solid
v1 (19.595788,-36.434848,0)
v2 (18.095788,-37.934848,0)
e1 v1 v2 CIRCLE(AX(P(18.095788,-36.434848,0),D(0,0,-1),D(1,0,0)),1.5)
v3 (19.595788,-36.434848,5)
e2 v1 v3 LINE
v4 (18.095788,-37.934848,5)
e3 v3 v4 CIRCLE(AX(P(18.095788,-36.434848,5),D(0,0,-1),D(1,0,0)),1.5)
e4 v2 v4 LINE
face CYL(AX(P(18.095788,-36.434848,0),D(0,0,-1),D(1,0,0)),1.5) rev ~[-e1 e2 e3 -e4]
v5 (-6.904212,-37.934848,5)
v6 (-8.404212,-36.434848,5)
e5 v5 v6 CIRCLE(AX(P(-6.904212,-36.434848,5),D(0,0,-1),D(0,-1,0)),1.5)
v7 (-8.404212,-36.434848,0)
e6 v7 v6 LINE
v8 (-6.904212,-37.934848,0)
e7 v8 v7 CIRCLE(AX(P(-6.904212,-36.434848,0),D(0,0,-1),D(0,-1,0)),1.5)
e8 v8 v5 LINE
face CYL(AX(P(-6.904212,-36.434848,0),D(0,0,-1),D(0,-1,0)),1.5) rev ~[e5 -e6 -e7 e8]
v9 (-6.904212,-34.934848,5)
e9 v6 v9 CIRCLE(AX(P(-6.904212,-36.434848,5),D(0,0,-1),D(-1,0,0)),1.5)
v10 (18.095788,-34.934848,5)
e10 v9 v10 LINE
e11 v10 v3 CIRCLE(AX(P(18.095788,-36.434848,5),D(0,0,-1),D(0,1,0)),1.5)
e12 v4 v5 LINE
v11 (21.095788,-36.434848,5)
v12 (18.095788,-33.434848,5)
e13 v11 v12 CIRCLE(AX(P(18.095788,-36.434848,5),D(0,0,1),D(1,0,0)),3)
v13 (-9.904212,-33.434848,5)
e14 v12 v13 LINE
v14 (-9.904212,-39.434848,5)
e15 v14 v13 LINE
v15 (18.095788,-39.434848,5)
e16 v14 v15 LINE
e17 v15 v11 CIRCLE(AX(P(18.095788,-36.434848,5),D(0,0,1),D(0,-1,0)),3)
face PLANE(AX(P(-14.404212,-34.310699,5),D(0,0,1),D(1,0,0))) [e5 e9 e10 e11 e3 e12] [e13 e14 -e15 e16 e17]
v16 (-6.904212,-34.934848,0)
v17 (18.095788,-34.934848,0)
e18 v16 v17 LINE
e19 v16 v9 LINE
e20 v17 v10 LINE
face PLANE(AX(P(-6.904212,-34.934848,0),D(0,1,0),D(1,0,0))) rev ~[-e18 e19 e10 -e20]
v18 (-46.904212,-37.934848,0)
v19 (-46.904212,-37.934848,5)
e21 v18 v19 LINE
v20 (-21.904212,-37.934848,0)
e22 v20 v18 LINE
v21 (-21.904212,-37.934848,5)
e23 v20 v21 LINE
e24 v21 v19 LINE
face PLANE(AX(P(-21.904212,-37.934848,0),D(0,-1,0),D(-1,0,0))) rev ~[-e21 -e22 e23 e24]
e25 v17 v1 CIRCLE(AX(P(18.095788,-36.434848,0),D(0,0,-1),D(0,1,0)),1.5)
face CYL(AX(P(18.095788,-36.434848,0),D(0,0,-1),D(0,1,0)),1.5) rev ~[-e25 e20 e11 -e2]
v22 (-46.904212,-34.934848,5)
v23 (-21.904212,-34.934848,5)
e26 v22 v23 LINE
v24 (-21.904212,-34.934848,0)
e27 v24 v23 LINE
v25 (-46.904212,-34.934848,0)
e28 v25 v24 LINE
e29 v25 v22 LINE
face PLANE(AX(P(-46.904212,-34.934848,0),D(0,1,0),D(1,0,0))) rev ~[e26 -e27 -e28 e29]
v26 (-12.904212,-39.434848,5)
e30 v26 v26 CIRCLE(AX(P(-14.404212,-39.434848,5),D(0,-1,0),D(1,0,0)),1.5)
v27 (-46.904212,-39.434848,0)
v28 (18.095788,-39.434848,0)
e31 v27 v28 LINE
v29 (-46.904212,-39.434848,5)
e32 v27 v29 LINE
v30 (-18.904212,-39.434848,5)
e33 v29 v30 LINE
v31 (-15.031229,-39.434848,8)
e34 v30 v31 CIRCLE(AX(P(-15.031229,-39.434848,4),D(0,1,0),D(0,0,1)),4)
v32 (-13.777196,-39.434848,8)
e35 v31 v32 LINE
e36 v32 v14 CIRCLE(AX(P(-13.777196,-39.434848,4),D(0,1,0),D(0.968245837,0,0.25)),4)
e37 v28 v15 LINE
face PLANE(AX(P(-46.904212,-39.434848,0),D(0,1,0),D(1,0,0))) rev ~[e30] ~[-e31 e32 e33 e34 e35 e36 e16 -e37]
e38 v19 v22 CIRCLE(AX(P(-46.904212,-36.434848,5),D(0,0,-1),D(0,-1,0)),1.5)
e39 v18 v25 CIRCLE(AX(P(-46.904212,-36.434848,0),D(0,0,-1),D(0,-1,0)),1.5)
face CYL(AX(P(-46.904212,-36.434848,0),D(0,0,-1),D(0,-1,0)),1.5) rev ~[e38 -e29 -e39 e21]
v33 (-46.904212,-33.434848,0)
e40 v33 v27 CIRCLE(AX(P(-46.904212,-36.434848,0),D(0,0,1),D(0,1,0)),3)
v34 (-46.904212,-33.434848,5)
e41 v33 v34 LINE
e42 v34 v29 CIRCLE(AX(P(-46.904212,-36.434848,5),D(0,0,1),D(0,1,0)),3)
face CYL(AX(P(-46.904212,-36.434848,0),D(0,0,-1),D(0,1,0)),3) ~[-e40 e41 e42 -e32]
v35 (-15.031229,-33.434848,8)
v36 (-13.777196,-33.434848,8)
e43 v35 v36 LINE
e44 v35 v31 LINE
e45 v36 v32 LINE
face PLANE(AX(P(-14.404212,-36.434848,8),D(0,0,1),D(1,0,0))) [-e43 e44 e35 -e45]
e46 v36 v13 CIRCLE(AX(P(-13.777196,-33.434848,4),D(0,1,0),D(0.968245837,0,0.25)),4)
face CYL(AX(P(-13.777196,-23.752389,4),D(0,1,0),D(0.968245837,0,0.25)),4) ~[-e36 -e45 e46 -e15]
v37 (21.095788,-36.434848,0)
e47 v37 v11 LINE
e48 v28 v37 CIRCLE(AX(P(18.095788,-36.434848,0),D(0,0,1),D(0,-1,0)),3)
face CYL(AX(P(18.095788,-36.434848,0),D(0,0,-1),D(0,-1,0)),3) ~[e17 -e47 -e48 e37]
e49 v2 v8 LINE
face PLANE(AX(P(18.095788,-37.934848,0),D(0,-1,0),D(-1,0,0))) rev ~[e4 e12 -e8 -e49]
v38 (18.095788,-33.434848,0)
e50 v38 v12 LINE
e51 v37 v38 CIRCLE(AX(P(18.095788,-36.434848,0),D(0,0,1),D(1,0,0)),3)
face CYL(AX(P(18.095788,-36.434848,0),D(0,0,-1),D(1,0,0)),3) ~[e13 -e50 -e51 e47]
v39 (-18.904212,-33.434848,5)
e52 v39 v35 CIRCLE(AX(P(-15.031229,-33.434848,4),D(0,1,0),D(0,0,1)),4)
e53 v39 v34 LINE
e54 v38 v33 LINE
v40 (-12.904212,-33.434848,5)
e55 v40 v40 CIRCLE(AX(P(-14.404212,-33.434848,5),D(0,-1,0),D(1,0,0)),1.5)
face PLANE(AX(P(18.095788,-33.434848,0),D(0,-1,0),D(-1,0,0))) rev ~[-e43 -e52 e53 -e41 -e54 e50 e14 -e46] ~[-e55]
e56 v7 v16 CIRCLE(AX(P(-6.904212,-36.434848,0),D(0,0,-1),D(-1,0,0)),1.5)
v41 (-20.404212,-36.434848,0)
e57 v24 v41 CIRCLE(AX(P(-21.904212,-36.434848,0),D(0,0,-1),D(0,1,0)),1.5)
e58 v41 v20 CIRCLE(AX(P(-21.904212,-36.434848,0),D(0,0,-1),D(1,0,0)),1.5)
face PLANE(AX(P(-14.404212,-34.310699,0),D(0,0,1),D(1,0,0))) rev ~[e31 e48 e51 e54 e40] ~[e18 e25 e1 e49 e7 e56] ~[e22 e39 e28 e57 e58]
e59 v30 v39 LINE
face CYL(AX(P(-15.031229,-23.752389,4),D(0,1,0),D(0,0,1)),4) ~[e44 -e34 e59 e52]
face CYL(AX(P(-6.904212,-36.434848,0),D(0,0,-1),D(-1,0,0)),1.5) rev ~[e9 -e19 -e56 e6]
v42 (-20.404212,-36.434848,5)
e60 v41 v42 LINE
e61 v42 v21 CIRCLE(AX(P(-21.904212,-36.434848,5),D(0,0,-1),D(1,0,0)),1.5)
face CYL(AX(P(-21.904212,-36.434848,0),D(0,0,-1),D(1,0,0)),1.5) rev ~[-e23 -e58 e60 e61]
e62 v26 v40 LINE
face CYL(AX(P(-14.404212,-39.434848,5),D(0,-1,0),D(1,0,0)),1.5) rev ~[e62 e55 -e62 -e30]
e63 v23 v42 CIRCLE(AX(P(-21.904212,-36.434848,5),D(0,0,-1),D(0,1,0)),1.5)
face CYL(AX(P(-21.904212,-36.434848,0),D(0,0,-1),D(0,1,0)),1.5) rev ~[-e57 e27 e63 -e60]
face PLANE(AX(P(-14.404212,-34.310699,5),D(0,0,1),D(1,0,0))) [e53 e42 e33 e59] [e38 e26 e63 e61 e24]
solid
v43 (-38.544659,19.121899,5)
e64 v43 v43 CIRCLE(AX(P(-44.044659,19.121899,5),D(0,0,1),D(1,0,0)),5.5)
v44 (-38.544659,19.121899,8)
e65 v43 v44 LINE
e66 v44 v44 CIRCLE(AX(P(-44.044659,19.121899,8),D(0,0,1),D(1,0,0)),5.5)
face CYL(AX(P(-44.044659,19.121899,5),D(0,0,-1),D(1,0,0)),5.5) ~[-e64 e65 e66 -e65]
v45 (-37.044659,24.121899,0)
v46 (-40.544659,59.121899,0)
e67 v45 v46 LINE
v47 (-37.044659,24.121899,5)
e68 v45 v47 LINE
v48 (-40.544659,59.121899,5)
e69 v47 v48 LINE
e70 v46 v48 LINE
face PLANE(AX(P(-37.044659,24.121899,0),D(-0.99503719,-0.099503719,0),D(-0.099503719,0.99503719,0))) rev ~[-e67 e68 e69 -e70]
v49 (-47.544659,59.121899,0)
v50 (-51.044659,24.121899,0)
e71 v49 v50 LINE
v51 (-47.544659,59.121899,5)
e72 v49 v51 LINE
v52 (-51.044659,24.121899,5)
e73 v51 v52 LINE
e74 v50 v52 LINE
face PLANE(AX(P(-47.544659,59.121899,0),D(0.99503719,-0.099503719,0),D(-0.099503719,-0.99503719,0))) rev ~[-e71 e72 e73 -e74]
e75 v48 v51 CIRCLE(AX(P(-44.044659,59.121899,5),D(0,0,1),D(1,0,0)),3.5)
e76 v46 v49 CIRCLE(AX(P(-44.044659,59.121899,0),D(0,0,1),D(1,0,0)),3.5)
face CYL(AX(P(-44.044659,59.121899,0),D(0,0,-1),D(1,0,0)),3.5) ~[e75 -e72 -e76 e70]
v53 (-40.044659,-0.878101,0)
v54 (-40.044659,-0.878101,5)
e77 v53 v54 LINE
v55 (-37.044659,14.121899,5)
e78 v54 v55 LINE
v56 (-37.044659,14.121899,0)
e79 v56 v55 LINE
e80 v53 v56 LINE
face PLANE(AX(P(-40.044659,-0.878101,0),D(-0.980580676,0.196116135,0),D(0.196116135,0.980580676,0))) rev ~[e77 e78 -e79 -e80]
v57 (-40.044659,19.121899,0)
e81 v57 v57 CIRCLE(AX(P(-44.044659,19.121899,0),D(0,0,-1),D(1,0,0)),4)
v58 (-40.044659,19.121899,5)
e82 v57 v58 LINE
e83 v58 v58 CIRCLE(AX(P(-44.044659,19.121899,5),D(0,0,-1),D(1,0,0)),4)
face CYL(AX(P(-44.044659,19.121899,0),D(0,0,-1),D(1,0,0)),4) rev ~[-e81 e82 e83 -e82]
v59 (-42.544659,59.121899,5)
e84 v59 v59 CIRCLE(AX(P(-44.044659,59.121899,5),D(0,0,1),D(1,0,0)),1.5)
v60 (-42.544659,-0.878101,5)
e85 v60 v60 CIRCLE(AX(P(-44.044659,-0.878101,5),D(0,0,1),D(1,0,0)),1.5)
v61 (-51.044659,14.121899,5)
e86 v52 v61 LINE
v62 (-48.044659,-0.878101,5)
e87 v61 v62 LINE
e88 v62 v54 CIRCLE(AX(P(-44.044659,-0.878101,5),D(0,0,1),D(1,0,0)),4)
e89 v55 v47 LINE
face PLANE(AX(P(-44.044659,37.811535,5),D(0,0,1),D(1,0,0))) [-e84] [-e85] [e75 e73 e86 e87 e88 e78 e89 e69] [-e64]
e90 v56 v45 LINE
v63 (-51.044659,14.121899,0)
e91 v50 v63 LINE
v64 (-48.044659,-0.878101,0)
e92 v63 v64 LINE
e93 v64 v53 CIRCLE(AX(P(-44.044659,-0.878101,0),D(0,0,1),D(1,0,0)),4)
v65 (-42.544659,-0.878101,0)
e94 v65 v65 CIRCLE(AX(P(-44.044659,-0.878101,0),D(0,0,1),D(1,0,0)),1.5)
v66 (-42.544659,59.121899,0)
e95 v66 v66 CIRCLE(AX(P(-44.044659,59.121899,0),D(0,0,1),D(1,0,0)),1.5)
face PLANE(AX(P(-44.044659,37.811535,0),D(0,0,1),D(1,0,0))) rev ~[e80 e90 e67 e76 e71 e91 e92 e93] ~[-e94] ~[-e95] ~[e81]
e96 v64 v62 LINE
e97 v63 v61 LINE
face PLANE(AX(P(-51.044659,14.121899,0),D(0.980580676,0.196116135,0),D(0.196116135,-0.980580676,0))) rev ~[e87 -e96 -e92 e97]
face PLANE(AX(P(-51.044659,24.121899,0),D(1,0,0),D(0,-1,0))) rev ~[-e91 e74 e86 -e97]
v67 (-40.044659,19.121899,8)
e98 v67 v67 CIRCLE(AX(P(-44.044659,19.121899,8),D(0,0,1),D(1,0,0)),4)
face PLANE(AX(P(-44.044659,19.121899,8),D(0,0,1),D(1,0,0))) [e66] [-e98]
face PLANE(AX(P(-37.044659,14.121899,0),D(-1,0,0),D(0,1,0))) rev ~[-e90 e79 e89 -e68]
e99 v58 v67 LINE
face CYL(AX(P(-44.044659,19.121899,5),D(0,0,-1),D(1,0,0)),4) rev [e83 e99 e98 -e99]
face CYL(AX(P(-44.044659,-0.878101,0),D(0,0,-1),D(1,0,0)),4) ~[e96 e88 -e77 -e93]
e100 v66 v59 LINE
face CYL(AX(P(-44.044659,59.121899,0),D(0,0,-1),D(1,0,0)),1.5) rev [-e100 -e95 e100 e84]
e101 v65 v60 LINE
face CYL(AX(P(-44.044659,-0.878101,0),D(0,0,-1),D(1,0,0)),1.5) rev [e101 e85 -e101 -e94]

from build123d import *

# Parameters (mm, degrees)
F0_R         = 1.5
F1_DEPTH     = 5
F2_R         = 5.5
F2_R_2       = 4
F3_DEPTH     = 3
F5_DEPTH     = 5
F6_W         = 9
F6_H         = 6
F7_DEPTH     = 3
F8_R         = 1.5
F9_DEPTH     = 25
F10_T1_DEPTH = 25.364916731


# Not quite as in the source:
# - a fillet or chamfer that OpenCascade refuses, or shapes differently, is made with other operations: its cross-section is extruded or revolved along the edge and cut away or added


with BuildPart() as f1:
    # F0 (on Top) → F1 (new body)
    with BuildSketch(Plane.XY):
        with BuildLine():
            ThreePointArc((-48.0446585417, 19.1218993813), (-44.0446585417, 23.1218993813), (-40.0446585417, 19.1218993813))
            Line((-40.0446585417, 19.1218993813), (-37.0446585417, 19.1218993813))
            Line((-37.0446585417, 19.1218993813), (-37.0446585417, 24.1218993813))
            Line((-37.0446585417, 24.1218993813), (-40.5446585417, 59.1218993813))
            ThreePointArc((-40.5446585417, 59.1218993813), (-44.0446585417, 55.6218993813), (-47.5446585417, 59.1218993813))
            Line((-47.5446585417, 59.1218993813), (-51.0446585417, 24.1218993813))
            Line((-51.0446585417, 24.1218993813), (-51.0446585417, 19.1218993813))
            Line((-51.0446585417, 19.1218993813), (-48.0446585417, 19.1218993813))
        make_face()
        with BuildLine():
            Line((-37.0446585417, 19.1218993813), (-40.0446585417, 19.1218993813))
            ThreePointArc((-40.0446585417, 19.1218993813), (-44.0446585417, 15.1218993813), (-48.0446585417, 19.1218993813))
            Line((-48.0446585417, 19.1218993813), (-51.0446585417, 19.1218993813))
            Line((-51.0446585417, 19.1218993813), (-51.0446585417, 14.1218993813))
            Line((-51.0446585417, 14.1218993813), (-48.0446585417, -0.8781006187))
            ThreePointArc((-48.0446585417, -0.8781006187), (-44.0446585417, 3.1218993813), (-40.0446585417, -0.8781006187))
            Line((-40.0446585417, -0.8781006187), (-37.0446585417, 14.1218993813))
            Line((-37.0446585417, 14.1218993813), (-37.0446585417, 19.1218993813))
        make_face()
        with BuildLine():
            ThreePointArc((-48.0446585417, -0.8781006187), (-44.0446585417, -4.8781006187), (-40.0446585417, -0.8781006187))
            ThreePointArc((-40.0446585417, -0.8781006187), (-44.0446585417, 3.1218993813), (-48.0446585417, -0.8781006187))
        make_face()
        with Locations((-44.0446585417, -0.8781006187)):
            Circle(F0_R, mode=Mode.SUBTRACT)
        with BuildLine():
            ThreePointArc((-47.5446585417, 59.1218993813), (-44.0446585417, 55.6218993813), (-40.5446585417, 59.1218993813))
            ThreePointArc((-40.5446585417, 59.1218993813), (-44.0446585417, 62.6218993813), (-47.5446585417, 59.1218993813))
        make_face()
        with Locations((-44.0446585417, 59.1218993813)):
            Circle(F0_R, mode=Mode.SUBTRACT)
    extrude(amount=F1_DEPTH)

    # F2 (on face) → F3 (join)
    with BuildSketch(Plane.XY.offset(5)):
        with Locations((-44.0446585417, 19.1218993813)):
            Circle(F2_R)
        with Locations((-44.0446585417, 19.1218993813)):
            Circle(F2_R_2, mode=Mode.SUBTRACT)
    extrude(amount=F3_DEPTH)


with BuildPart() as f5:
    # F4 (on Top) → F5 (new body)
    with BuildSketch(Plane.XY):
        with BuildLine():
            ThreePointArc((-46.904212172, -33.4348478615), (-45.404212172, -33.8367716502), (-44.3061359607, -34.9348478615))
            Line((-44.3061359607, -34.9348478615), (-21.904212172, -34.9348478615))
            ThreePointArc((-21.904212172, -34.9348478615), (-20.8435520003, -35.3741876897), (-20.404212172, -36.4348478615))
            Line((-20.404212172, -36.4348478615), (-8.404212172, -36.4348478615))
            ThreePointArc((-8.404212172, -36.4348478615), (-7.9648723438, -35.3741876897), (-6.904212172, -34.9348478615))
            Line((-6.904212172, -34.9348478615), (15.4977116166, -34.9348478615))
            ThreePointArc((15.4977116166, -34.9348478615), (16.595787828, -33.8367716502), (18.095787828, -33.4348478615))
            Line((18.095787828, -33.4348478615), (-46.904212172, -33.4348478615))
        make_face()
        with BuildLine():
            Line((-21.904212172, -37.9348478615), (-44.3061359607, -37.9348478615))
            ThreePointArc((-44.3061359607, -37.9348478615), (-45.404212172, -39.0329240729), (-46.904212172, -39.4348478615))
            Line((-46.904212172, -39.4348478615), (18.095787828, -39.4348478615))
            ThreePointArc((18.095787828, -39.4348478615), (16.595787828, -39.0329240729), (15.4977116166, -37.9348478615))
            Line((15.4977116166, -37.9348478615), (-6.904212172, -37.9348478615))
            ThreePointArc((-6.904212172, -37.9348478615), (-7.9648723438, -37.4955080333), (-8.404212172, -36.4348478615))
            Line((-8.404212172, -36.4348478615), (-20.404212172, -36.4348478615))
            ThreePointArc((-20.404212172, -36.4348478615), (-20.8435520003, -37.4955080333), (-21.904212172, -37.9348478615))
        make_face()
        with BuildLine():
            ThreePointArc((-46.904212172, -37.9348478615), (-48.404212172, -36.4348478615), (-46.904212172, -34.9348478615))
            Line((-46.904212172, -34.9348478615), (-44.3061359607, -34.9348478615))
            ThreePointArc((-44.3061359607, -34.9348478615), (-45.404212172, -33.8367716502), (-46.904212172, -33.4348478615))
            ThreePointArc((-46.904212172, -33.4348478615), (-49.904212172, -36.4348478615), (-46.904212172, -39.4348478615))
            ThreePointArc((-46.904212172, -39.4348478615), (-45.404212172, -39.0329240729), (-44.3061359607, -37.9348478615))
            Line((-44.3061359607, -37.9348478615), (-46.904212172, -37.9348478615))
        make_face()
        with BuildLine():
            ThreePointArc((21.095787828, -36.4348478615), (20.2171081715, -34.313527518), (18.095787828, -33.4348478615))
            ThreePointArc((18.095787828, -33.4348478615), (16.595787828, -33.8367716502), (15.4977116166, -34.9348478615))
            Line((15.4977116166, -34.9348478615), (18.095787828, -34.9348478615))
            ThreePointArc((18.095787828, -34.9348478615), (19.1564479997, -35.3741876897), (19.595787828, -36.4348478615))
            ThreePointArc((19.595787828, -36.4348478615), (19.1564479997, -37.4955080333), (18.095787828, -37.9348478615))
            Line((18.095787828, -37.9348478615), (15.4977116166, -37.9348478615))
            ThreePointArc((15.4977116166, -37.9348478615), (16.595787828, -39.0329240729), (18.095787828, -39.4348478615))
            ThreePointArc((18.095787828, -39.4348478615), (20.2171081715, -38.5561682051), (21.095787828, -36.4348478615))
        make_face()
    extrude(amount=F5_DEPTH)

    # F6 (on face) → F7 (join)
    with BuildSketch(Plane.XY.offset(5)):
        with Locations((-14.404212172, -36.4348478615)):
            Rectangle(F6_W, F6_H)
    extrude(amount=F7_DEPTH)

    # F8 (on face) → F9 (cut)
    with BuildSketch(Plane.XZ.offset(39.4348478615)):
        with Locations((-14.404212172, 5)):
            Circle(F8_R)
    extrude(amount=-F9_DEPTH, mode=Mode.SUBTRACT)

    # F10: fillet of radius 4 on 2 edges, made by hand

    # F10_s2 → F10_t1 (cut)
    with BuildSketch(Plane.XZ.offset(23.752389496)):
        with BuildLine():
            ThreePointArc((-15.0312288258, 8), (-17.4807185686, 7.1622776602), (-18.904212172, 5))
            Line((-18.904212172, 5), (-18.904212172, 8))
            Line((-18.904212172, 8), (-15.0312288258, 8))
        make_face()
        with BuildLine():
            ThreePointArc((-9.904212172, 5), (-11.3277057755, 7.1622776602), (-13.7771955183, 8))
            Line((-13.7771955183, 8), (-9.904212172, 8))
            Line((-9.904212172, 8), (-9.904212172, 5))
        make_face()
    extrude(amount=F10_T1_DEPTH, mode=Mode.SUBTRACT)


solid = Compound([f1.part, f5.part])
